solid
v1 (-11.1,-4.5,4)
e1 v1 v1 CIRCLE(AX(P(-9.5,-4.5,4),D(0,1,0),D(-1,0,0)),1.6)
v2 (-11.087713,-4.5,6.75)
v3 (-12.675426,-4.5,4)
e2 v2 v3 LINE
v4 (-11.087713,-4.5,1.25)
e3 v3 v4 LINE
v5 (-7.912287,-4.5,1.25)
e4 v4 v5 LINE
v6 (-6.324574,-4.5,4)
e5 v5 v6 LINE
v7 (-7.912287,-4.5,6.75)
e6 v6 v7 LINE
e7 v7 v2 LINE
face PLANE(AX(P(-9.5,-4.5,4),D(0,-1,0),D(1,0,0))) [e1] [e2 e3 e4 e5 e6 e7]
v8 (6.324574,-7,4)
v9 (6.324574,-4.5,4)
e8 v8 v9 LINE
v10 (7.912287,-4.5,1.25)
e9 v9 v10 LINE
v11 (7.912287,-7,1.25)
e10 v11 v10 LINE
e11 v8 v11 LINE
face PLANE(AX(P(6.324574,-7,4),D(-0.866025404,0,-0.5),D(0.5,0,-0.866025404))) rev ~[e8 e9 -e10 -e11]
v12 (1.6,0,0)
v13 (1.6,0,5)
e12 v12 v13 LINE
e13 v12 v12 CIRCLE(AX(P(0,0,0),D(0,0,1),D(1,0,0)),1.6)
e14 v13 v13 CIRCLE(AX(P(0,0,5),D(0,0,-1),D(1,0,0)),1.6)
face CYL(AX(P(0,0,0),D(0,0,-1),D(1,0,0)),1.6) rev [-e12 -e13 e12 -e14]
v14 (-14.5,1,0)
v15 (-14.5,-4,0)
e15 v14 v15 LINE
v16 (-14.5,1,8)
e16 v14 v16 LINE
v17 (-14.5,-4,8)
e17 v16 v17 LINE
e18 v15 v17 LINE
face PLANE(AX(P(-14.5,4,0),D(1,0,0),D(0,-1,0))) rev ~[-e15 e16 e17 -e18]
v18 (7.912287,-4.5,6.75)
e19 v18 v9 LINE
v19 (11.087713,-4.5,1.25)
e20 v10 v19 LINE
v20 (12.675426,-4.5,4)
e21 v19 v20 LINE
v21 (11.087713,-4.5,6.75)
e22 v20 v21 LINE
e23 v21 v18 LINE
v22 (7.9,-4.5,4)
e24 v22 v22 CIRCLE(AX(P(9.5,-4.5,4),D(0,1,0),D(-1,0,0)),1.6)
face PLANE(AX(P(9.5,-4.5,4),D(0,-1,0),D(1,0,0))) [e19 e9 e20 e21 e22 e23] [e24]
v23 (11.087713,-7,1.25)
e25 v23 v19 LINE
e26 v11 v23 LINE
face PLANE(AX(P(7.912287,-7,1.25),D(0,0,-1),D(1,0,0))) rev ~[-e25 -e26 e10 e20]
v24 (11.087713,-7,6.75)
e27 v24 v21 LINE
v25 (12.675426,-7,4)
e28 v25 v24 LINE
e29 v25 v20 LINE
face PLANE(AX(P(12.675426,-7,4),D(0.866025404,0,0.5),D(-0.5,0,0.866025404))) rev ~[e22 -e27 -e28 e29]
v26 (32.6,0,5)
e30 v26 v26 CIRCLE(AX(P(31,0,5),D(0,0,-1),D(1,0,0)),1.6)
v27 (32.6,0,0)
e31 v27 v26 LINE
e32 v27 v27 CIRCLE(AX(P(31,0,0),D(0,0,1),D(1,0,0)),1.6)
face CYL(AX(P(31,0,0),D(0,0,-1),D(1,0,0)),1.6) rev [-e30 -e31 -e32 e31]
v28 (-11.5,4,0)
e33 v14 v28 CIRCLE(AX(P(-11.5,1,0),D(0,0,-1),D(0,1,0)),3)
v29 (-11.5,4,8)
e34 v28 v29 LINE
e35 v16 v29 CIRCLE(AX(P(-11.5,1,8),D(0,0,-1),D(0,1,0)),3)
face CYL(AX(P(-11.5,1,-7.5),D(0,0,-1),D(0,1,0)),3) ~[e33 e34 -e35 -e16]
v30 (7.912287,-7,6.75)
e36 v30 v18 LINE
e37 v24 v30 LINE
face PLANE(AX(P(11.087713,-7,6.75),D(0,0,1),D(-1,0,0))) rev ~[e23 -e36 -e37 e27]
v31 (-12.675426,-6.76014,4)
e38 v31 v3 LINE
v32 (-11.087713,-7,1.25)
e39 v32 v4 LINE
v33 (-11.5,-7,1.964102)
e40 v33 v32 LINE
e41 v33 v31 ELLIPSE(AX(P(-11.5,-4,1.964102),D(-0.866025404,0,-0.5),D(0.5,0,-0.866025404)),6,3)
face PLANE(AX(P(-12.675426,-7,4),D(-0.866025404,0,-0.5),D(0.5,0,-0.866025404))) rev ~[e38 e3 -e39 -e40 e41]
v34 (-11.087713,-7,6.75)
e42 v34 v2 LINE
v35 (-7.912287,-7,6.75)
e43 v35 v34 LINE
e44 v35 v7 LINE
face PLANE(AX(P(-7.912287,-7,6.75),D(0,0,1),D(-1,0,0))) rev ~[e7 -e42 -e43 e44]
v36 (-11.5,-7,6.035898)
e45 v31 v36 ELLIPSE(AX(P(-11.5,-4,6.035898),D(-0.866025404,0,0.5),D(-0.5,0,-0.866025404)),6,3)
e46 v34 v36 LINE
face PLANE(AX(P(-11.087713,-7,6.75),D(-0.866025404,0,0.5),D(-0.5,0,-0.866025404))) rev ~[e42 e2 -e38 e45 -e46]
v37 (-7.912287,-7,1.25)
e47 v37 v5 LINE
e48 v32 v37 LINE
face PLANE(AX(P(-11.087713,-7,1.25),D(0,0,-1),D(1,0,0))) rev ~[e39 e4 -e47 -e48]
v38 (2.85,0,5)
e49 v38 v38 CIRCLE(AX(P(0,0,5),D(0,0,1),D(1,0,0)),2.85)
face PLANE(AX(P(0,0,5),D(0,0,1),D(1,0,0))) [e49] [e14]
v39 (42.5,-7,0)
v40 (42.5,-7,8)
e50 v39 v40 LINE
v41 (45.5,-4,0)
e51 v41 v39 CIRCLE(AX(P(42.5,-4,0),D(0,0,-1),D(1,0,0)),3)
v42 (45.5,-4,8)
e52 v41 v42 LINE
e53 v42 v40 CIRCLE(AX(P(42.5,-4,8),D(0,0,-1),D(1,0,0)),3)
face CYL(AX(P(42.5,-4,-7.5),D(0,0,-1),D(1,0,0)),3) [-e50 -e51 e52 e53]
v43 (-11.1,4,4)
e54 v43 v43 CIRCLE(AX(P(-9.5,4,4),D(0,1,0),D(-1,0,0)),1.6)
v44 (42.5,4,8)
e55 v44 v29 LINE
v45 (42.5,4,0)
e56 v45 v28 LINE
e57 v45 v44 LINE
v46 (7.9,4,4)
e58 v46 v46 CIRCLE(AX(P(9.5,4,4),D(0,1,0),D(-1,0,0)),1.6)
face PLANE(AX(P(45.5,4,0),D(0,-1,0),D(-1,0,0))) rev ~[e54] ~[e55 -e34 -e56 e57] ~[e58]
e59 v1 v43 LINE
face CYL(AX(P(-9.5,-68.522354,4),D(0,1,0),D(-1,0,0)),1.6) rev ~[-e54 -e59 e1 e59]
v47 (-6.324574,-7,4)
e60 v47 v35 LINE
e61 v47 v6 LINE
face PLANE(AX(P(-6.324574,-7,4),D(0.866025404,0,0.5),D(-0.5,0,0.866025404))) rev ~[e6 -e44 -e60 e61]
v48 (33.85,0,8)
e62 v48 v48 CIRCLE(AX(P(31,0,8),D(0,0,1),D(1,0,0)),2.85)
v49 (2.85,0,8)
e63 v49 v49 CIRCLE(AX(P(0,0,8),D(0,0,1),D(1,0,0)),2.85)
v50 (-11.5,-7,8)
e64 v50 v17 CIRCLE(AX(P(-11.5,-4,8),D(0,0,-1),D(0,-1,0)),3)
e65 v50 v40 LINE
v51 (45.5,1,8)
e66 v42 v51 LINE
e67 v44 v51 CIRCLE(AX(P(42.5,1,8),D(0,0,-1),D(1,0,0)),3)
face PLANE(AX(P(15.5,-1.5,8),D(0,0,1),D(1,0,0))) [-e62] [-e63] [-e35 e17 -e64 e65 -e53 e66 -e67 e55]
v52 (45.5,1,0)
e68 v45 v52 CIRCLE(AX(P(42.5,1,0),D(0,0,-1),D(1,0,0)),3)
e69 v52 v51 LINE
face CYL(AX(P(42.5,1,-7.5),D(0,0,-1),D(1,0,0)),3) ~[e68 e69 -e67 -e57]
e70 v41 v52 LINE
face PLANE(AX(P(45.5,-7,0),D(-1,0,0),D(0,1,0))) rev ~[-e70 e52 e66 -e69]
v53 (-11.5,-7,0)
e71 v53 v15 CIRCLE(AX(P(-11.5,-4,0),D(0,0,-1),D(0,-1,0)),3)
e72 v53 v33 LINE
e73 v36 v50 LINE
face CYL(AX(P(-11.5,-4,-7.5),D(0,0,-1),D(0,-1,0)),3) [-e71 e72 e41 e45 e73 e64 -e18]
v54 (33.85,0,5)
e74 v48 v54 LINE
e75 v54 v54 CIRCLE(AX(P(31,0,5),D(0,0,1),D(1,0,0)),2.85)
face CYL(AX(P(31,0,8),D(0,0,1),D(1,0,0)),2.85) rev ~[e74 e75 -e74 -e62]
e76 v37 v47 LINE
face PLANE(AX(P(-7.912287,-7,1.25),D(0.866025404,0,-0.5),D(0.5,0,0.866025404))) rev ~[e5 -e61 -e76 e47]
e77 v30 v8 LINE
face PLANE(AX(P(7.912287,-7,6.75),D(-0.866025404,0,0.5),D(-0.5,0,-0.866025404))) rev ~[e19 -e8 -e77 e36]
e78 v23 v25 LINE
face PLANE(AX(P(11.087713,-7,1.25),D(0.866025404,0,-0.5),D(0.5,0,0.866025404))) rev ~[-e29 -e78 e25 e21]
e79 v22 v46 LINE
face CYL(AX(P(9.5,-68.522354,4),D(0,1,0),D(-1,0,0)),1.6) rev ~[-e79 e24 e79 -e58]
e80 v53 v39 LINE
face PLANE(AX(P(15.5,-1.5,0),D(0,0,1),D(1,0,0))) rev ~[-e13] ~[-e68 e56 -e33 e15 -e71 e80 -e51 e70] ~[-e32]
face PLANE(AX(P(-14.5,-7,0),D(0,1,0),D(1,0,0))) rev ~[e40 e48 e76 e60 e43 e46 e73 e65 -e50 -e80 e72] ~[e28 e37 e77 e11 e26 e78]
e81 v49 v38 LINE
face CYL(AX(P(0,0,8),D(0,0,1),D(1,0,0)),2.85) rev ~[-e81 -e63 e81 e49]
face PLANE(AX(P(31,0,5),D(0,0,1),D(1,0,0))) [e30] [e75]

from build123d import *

# Parameters (mm, degrees)
F1_R        = 1.6
F2_DEPTH    = 8
F3_R        = 2.85
F4_DEPTH    = 3
F6_DEPTH    = 2.5
F7_D        = 3.2
F8_T1_DEPTH = 23


# Not quite as in the source:
# - a fillet or chamfer that OpenCascade refuses, or shapes differently, is made with other operations: its cross-section is extruded or revolved along the edge and cut away or added


with BuildPart() as f2:
    # F1 (on Top) → F2 (new body)
    with BuildSketch(Plane.XY):
        Polygon((45.5, -7), (45.5, 0), (45.5, 4), (-14.5, 4), (-14.5, 0), (-14.5, -0.2), (-14.5, -7), (-9.5, -7), (40.5, -7), align=None)
        Circle(F1_R, mode=Mode.SUBTRACT)
        with Locations((31, 0)):
            Circle(F1_R, mode=Mode.SUBTRACT)
    extrude(amount=F2_DEPTH)

    # F3 (on face) → F4 (cut)
    with BuildSketch(Plane.XY.offset(8)):
        Circle(F3_R)
        with Locations((31, 0)):
            Circle(F3_R)
    extrude(amount=-F4_DEPTH, mode=Mode.SUBTRACT)

    # F5 (on face) → F6 (cut)
    with BuildSketch(Plane.XZ.offset(7)):
        Polygon((-7.9122867597, 6.75), (-11.0877132403, 6.75), (-12.6754264805, 4), (-11.0877132403, 1.25), (-7.9122867597, 1.25), (-6.3245735195, 4), align=None)
        Polygon((11.0877132403, 6.75), (7.9122867597, 6.75), (6.3245735195, 4), (7.9122867597, 1.25), (11.0877132403, 1.25), (12.6754264805, 4), align=None)
    extrude(amount=-F6_DEPTH, mode=Mode.SUBTRACT)

    # F7 (through all)
    with Locations(Plane.XZ.offset(7)):
        with Locations((-9.5, 4), (9.5, 4)):
            Hole(F7_D / 2)

    # F8: fillet of radius 3 on 4 edges, made by hand

    # F8_s2 → F8_t1 (cut)
    with BuildSketch(Plane.XY.offset(-7.5)):
        with BuildLine():
            ThreePointArc((-11.5, 4), (-13.6213203436, 3.1213203436), (-14.5, 1))
            Line((-14.5, 1), (-14.5, 4))
            Line((-14.5, 4), (-11.5, 4))
        make_face()
        with BuildLine():
            ThreePointArc((45.5, -4), (44.6213203436, -6.1213203436), (42.5, -7))
            Line((42.5, -7), (45.5, -7))
            Line((45.5, -7), (45.5, -4))
        make_face()
        with BuildLine():
            ThreePointArc((45.5, 1), (44.6213203436, 3.1213203436), (42.5, 4))
            Line((42.5, 4), (45.5, 4))
            Line((45.5, 4), (45.5, 1))
        make_face()
        with BuildLine():
            ThreePointArc((-11.5, -7), (-13.6213203436, -6.1213203436), (-14.5, -4))
            Line((-14.5, -4), (-14.5, -7))
            Line((-14.5, -7), (-11.5, -7))
        make_face()
    extrude(amount=F8_T1_DEPTH, mode=Mode.SUBTRACT)


solid = f2.part
